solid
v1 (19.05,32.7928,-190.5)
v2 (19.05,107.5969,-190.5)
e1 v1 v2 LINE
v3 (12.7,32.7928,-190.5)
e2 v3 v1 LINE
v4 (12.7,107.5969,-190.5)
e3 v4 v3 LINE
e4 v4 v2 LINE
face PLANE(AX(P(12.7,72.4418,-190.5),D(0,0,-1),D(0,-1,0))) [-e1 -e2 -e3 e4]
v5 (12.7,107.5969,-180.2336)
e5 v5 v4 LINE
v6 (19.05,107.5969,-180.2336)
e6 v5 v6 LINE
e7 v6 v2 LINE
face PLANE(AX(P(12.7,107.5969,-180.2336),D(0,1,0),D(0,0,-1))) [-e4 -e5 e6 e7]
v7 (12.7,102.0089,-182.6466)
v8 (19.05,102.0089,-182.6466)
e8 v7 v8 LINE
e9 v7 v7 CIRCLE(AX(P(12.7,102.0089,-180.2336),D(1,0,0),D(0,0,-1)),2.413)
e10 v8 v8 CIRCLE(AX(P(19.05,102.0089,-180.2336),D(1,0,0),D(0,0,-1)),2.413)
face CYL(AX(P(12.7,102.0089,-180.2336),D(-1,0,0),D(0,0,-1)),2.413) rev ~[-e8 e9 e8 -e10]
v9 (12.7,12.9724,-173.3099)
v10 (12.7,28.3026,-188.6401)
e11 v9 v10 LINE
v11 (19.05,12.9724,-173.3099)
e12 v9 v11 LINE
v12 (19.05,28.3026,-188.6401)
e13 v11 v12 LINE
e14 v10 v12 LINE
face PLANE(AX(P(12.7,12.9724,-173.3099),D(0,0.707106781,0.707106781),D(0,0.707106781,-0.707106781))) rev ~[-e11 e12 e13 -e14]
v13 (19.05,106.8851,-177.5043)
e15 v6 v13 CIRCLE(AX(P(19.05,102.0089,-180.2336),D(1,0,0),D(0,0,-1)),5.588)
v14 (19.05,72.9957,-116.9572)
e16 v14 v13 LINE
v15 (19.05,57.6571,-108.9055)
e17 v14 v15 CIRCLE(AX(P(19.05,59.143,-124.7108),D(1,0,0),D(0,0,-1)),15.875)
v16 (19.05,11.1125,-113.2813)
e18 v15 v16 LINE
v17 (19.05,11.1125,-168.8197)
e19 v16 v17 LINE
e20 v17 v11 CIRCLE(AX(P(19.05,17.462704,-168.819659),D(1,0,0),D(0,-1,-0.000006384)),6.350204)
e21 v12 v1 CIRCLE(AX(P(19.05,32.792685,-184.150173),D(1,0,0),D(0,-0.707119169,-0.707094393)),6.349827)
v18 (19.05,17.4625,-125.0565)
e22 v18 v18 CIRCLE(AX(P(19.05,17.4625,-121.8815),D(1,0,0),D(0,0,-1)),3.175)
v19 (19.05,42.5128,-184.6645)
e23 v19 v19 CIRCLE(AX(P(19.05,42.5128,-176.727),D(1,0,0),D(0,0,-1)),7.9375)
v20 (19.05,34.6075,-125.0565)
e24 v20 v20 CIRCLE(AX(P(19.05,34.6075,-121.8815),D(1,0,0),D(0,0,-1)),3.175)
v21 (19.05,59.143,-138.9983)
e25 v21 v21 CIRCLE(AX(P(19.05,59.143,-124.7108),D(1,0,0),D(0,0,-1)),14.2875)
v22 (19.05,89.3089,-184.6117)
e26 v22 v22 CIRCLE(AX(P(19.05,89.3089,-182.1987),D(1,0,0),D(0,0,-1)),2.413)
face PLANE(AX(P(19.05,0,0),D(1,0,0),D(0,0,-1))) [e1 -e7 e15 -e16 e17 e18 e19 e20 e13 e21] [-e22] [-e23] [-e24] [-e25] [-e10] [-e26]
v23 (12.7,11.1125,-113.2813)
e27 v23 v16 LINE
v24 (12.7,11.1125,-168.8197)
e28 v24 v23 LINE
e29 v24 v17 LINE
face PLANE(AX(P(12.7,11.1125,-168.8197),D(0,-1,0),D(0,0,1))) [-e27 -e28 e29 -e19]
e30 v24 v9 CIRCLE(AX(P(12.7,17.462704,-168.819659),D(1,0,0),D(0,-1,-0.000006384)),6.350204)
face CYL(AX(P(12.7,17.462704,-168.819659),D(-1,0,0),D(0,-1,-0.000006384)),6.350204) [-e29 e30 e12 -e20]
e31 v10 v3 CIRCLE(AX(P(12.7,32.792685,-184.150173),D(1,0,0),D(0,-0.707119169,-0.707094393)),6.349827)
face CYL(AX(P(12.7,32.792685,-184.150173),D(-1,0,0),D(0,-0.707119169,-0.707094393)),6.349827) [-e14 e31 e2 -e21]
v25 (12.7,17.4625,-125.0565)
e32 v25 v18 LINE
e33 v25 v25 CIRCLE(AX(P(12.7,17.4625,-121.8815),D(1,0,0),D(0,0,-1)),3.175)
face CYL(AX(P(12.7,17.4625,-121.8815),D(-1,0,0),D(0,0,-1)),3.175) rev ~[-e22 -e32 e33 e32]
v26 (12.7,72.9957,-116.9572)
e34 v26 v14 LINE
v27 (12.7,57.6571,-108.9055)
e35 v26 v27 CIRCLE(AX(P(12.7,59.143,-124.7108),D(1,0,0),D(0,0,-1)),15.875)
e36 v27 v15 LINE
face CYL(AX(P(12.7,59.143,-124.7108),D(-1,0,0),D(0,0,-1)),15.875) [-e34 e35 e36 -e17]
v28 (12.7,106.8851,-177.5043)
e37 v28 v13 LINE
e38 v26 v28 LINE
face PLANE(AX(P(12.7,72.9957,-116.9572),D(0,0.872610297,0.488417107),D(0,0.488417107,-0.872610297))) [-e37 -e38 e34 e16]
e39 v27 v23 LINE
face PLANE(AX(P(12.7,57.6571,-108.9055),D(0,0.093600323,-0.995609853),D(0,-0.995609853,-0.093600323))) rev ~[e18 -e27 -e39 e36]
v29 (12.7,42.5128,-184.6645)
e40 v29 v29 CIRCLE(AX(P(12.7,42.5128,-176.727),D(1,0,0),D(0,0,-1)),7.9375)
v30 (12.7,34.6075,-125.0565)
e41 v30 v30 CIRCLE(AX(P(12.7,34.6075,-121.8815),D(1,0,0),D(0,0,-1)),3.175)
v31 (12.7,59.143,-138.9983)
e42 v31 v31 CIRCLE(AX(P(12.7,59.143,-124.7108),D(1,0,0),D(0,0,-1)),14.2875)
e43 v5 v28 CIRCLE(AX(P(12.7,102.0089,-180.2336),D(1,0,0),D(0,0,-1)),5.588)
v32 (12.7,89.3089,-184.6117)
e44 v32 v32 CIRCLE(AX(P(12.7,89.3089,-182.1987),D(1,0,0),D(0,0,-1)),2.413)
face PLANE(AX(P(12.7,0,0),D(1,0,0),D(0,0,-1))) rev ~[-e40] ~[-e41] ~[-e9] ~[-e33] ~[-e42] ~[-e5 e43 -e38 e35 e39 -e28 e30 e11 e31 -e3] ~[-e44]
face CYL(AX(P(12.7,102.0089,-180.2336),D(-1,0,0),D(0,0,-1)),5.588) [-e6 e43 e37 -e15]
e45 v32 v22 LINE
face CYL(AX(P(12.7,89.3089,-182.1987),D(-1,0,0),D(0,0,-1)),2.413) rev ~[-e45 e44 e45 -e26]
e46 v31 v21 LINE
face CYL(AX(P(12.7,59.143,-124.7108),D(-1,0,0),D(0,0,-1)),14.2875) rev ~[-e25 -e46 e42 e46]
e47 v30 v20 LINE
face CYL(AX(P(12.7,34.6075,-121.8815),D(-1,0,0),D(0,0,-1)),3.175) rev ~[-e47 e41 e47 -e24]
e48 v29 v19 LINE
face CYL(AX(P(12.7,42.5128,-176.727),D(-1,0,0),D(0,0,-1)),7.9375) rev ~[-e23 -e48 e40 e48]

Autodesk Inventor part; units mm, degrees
ref_plane "YZ Plane" through (0, 0, 0) normal (1, 0, 0) x (0, 1, 0)
ref_plane "XZ Plane" through (0, 0, 0) normal (0, 1, 0) x (-1, 0, 0)
sketch "Sketch1" plane through (0, 0, 0) normal (1, 0, 0) x (0, 1, 0)
  line L0 (111.125, 190.5) -> (68.3957, 190.5)
  line L1 (20.2274, 160.5064) -> (-11.1661, 102.5705)
  arc A0 (-11.1661, 102.5705) -> (-11.1661, 90.4695) centre (0, 96.52) ccw
  line L2 (-11.1661, 90.4695) -> (7.6076, 55.8231)
  arc A1 (-11.1661, 6.0505) -> (-11.1661, -6.0505) centre (0, 0) ccw
  line L3 (-11.1661, -6.0505) -> (7.6076, -40.6969)
  arc A2 (-11.1661, -90.4695) -> (-11.3095, -102.2979) centre (0, -96.52) ccw
  line L4 (-11.3095, -102.2979) -> (18.6694, -160.9782)
  line L5 (67.5494, -190.5) -> (111.125, -190.5)
  line L6 (111.125, -190.5) -> (111.125, 190.5)
  arc A3 (20.2274, 160.5064) -> (68.3957, 190.5) centre (42.5128, 178.392) ccw
  arc A4 (67.5494, -190.5) -> (18.6694, -160.9782) centre (42.5128, -176.727) ccw
  circle A5 centre (42.5128, 178.392) radius 4.7625 construction
  circle A6 centre (34.925, -92.075) radius 7.9375 projected
  circle A7 centre (73.5908, -125.0234) radius 6.35 construction
  circle A8 centre (42.5128, -176.727) radius 4.7625 construction
  line L7 (111.125, 0) -> (0, 0) construction
  circle A9 centre (0, 96.52) radius 2.4892 construction
  circle A10 centre (0, 0) radius 2.4892 construction
  circle A11 centre (0, -96.52) radius 2.4892 construction
  line L8 (-11.1661, 6.0505) -> (7.6076, 40.6969)
  arc A12 (7.6076, 40.6969) -> (7.6076, 55.8231) centre (-6.35, 48.26) ccw
  line L9 (-11.1661, -90.4695) -> (7.6076, -55.8231)
  arc A13 (7.6076, -55.8231) -> (7.6076, -40.6969) centre (-6.35, -48.26) ccw
  line L10 (-6.35, -48.26) -> (-6.35, 48.26) construction
  line L11 (-6.35, 0) -> (0, 0) construction
  circle A14 centre (0, 96.52) radius 3.175
  circle A15 centre (0, 0) radius 3.175
  circle A16 centre (0, -96.52) radius 3.175
  circle A17 centre (46.0375, 122.682) radius 3.5687 construction
  circle A18 centre (20.6375, 122.682) radius 3.5687 construction
  circle A19 centre (46.0375, 122.682) radius 3.175
  circle A20 centre (20.6375, 122.682) radius 3.175
  line L12 (0, 96.52) -> (-12.7, 96.52) construction
  circle A21 centre (99.3625, 57.065) radius 2.0193
  circle A22 centre (47.625, -17.78) radius 2.0193
  circle A23 centre (99.3625, 31.665) radius 2.0193
  circle A24 centre (73.9625, 57.065) radius 2.0193
  circle A25 centre (73.9625, 31.665) radius 2.0193
  circle A26 centre (47.625, -43.18) radius 2.0193
  circle A27 centre (22.225, -17.78) radius 2.0193
  circle A28 centre (22.225, -43.18) radius 2.0193
  circle A29 centre (85.725, 107.103) radius 7.9375
  line L13 (-12.7, 173.6352) -> (-12.7, -210.2893) construction
  circle A30 centre (85.725, 107.103) radius 17.78 construction
  circle A31 centre (79.375, 147.2439) radius 22.86 construction
  circle A32 centre (42.5128, 178.392) radius 25.4 construction
  line L14 (110.475, 71.035) -> (60.975, 71.035) construction
  line L15 (60.975, 71.035) -> (60.975, -72.669) construction
  line L16 (60.975, -72.669) -> (110.475, -72.669) construction
  line L17 (110.475, -72.669) -> (110.475, 71.035) construction
  line L18 (58.7375, 86.554) -> (9.2375, 86.554) construction
  line L19 (9.2375, 86.554) -> (9.2375, -57.15) construction
  line L20 (9.2375, -57.15) -> (58.7375, -57.15) construction
  line L21 (58.7375, -57.15) -> (58.7375, 86.554) construction
  line L22 (9.525, 127) -> (-15.875, 127) construction
  line L23 (-15.875, 127) -> (-15.875, -177.8) construction
  line L24 (-15.875, -177.8) -> (9.525, -177.8) construction
  line L25 (9.525, -177.8) -> (9.525, 127) construction
  circle A33 centre (34.925, -92.075) radius 17.78 construction
  circle A34 centre (73.5908, -125.0234) radius 28.575 construction
  circle A35 centre (42.5128, -176.727) radius 31.75 construction
  circle A36 centre (102.0089, 180.2336) radius 2.413
  circle A37 centre (89.3089, 182.1987) radius 2.413
  circle A38 centre (102.0089, -180.2336) radius 2.413
  circle A39 centre (89.3089, -182.1987) radius 2.413
  circle A40 centre (79.375, 147.2439) radius 14.2875
  circle A41 centre (66.675, 254) radius 60.325 construction
  circle A42 centre (66.675, -254) radius 60.325 construction
  circle A43 centre (73.5908, -125.0234) radius 14.2875
  circle A44 centre (80.899, -155.6385) radius 47.527 construction
  circle A45 centre (100.0125, -85.369) radius 3.175
  circle A46 centre (74.6125, -85.369) radius 3.175
  circle A47 centre (100.0125, -85.369) radius 6.35 construction
  circle A48 centre (74.6125, -85.369) radius 6.35 construction
  circle A49 centre (46.0375, 122.682) radius 6.35 construction
  circle A50 centre (20.6375, 122.682) radius 6.35 construction
  circle A51 centre (34.6075, -121.8815) radius 3.175
  circle A52 centre (17.4625, -121.8815) radius 3.175
  circle A53 centre (34.6075, -121.8815) radius 6.35 construction
  circle A54 centre (17.4625, -121.8815) radius 6.35 construction
  circle A55 centre (101.6, 78.9725) radius 3.175
  circle A56 centre (101.6, 78.9725) radius 6.35 construction
  line L26 (92.075, 107.103) -> (79.375, 107.103) construction
  line L27 (79.375, 107.103) -> (79.375, 71.035) construction
  line L28 (79.375, 71.035) -> (92.075, 71.035) construction
  line L29 (92.075, 71.035) -> (92.075, 107.103) construction
  line L30 (85.725, 107.103) -> (85.725, 71.035) construction
  circle A57 centre (69.85, 78.9725) radius 3.175
  circle A58 centre (69.85, 78.9725) radius 6.35 construction
  circle A59 centre (59.143, -124.7108) radius 14.2875
  circle A60 centre (59.143, -124.7108) radius 22.86 construction
  dimension "d2" = 15.875
  dimension "d3" = 6.35
  dimension "d4" = 96.52
  dimension "d8" = 6.35
  dimension "d9" = 381
  dimension "d11" = 28.575
  dimension "d12" = 12.7
  dimension "d135" = 4.0386
  dimension "d136" = 4.0386
  dimension "d139" = 25.4
  dimension "d142" = 25.4
  dimension "d147" = 25.4
  dimension "d150" = 25.4
  dimension "d155" = 12.7
  dimension "d156" = 48.895
  dimension "d225" = 15.875
  dimension "d226" = 25.4
  dimension "d227" = 50.038
  dimension "d229" = 123.825
  dimension "d230" = 35.56
  dimension "d231" = 45.72
  dimension "d232" = 50.8
  dimension "d233" = 49.5
  dimension "d234" = 143.704
  dimension "d235" = 13.97
  dimension "d236" = 11.1125
  dimension "d237" = 143.704
  dimension "d238" = 49.5
  dimension "d239" = 11.1125
  dimension "d240" = 13.97
  dimension "d242" = 25.4
  dimension "d243" = 304.8
  dimension "d245" = 9.525
  dimension "d246" = 35.56
  dimension "d247" = 57.15
  dimension "d248" = 63.5
  dimension "d249" = 28.575
  dimension "d250" = 31.75
  dimension "d251" = 4.826
  dimension "d252" = 4.826
  dimension "d253" = 4.826
  dimension "d254" = 4.826
  dimension "d256" = 9.1161
  dimension "d257" = 12.7
  dimension "d258" = 1.9652
  dimension "d259" = 10.2664
  dimension "d260" = 12.7
  dimension "d261" = 1.9652
  dimension "d262" = 9.1161
  dimension "d263" = 10.2664
  dimension "d264" = 120.65
  dimension "d265" = 120.65
  dimension "d266" = 44.45
  dimension "d267" = 63.5
  dimension "d268" = 63.5
  dimension "d269" = 28.575
  dimension "d270" = 98.3615
  dimension "d271" = 14.224
  dimension "d272" = 95.054
  dimension "d273" = 6.35
  dimension "d274" = 6.35
  dimension "d275" = 25.4
  dimension "d276" = 11.1125
  dimension "d277" = 12.7
ref_plane "Work Plane1" through (12.7, 0, 0) normal (1, 0, 0) x (0, 0, -1)
sketch "Sketch13" plane through (12.7, 0, 0) normal (1, 0, 0) x (0, 0, -1)
  circle A0 centre (180.2336, 102.0089) radius 2.413 projected
  circle A1 centre (182.1987, 89.3089) radius 2.413 projected
  circle A2 centre (176.727, 42.5128) radius 4.7625 construction
  line L0 (177.8, 9.525) -> (-127, 9.525) construction
  line L1 (177.8, -15.875) -> (177.8, 9.525) construction
  circle A3 centre (121.8815, 34.6075) radius 3.175 projected
  circle A4 centre (121.8815, 17.4625) radius 3.175 projected
  line L2 (190.5, 111.125) -> (-190.5, 111.125) projected
  line L3 (190.5, 72.4418) -> (190.5, 111.125) projected
  circle A5 centre (124.7108, 59.143) radius 15.875
  circle A6 centre (180.2336, 102.0089) radius 5.588
  circle A7 centre (182.1987, 89.3089) radius 5.588
  circle A8 centre (176.727, 42.5128) radius 7.9375
  circle A9 centre (121.8815, 34.6075) radius 6.35
  circle A10 centre (121.8815, 17.4625) radius 6.35
  circle A11 centre (125.0234, 73.5908) radius 28.575 construction
  circle A12 centre (92.075, 34.925) radius 22.225 construction
  circle A13 centre (176.727, 42.5128) radius 31.75 construction
  line L4 (116.9572, 72.9957) -> (177.5043, 106.8851)
  line L5 (180.2336, 107.5969) -> (190.5, 107.5969)
  line L6 (168.8197, 11.1125) -> (113.2813, 11.1125)
  line L7 (108.9055, 57.6571) -> (113.2813, 11.1125)
  line L8 (173.3099, 12.9724) -> (188.6401, 28.3026)
  line L9 (190.5, 72.4418) -> (190.5, 32.7928)
  arc A14 (168.8197, 11.1125) -> (173.3099, 12.9724) centre (168.8197, 17.4625) ccw
  arc A15 (188.6401, 28.3026) -> (190.5, 32.7928) centre (184.15, 32.7928) ccw
  circle A16 centre (124.7108, 59.143) radius 14.2875 projected
  point P0 (0, 0)
  point P1 (190.5, 30.1625)
  point P2 (171.45, 11.1125)
  point P3 (121.8815, 11.1125)
  dimension "d299" = 3.175
  dimension "d300" = 3.175
  dimension "d303" = 15.875
  dimension "d304" = 12.7
  dimension "d305" = 12.7
  dimension "d307" = 19.05
  dimension "d308" = 19.05
  dimension "d309" = 6.35
  dimension "d310" = 6.35
  dimension "d313" = 31.75
extrude "Extrusion14" add sketch "Sketch13" along normal blind 6.35 contours A10 | L9 A15 L8 A14 L6 L7 A5 L4 A6 L5 L3 | A6 | A5 | A7 | A9
properties part number "OuterDriveRail" material "Aluminum 6061"
